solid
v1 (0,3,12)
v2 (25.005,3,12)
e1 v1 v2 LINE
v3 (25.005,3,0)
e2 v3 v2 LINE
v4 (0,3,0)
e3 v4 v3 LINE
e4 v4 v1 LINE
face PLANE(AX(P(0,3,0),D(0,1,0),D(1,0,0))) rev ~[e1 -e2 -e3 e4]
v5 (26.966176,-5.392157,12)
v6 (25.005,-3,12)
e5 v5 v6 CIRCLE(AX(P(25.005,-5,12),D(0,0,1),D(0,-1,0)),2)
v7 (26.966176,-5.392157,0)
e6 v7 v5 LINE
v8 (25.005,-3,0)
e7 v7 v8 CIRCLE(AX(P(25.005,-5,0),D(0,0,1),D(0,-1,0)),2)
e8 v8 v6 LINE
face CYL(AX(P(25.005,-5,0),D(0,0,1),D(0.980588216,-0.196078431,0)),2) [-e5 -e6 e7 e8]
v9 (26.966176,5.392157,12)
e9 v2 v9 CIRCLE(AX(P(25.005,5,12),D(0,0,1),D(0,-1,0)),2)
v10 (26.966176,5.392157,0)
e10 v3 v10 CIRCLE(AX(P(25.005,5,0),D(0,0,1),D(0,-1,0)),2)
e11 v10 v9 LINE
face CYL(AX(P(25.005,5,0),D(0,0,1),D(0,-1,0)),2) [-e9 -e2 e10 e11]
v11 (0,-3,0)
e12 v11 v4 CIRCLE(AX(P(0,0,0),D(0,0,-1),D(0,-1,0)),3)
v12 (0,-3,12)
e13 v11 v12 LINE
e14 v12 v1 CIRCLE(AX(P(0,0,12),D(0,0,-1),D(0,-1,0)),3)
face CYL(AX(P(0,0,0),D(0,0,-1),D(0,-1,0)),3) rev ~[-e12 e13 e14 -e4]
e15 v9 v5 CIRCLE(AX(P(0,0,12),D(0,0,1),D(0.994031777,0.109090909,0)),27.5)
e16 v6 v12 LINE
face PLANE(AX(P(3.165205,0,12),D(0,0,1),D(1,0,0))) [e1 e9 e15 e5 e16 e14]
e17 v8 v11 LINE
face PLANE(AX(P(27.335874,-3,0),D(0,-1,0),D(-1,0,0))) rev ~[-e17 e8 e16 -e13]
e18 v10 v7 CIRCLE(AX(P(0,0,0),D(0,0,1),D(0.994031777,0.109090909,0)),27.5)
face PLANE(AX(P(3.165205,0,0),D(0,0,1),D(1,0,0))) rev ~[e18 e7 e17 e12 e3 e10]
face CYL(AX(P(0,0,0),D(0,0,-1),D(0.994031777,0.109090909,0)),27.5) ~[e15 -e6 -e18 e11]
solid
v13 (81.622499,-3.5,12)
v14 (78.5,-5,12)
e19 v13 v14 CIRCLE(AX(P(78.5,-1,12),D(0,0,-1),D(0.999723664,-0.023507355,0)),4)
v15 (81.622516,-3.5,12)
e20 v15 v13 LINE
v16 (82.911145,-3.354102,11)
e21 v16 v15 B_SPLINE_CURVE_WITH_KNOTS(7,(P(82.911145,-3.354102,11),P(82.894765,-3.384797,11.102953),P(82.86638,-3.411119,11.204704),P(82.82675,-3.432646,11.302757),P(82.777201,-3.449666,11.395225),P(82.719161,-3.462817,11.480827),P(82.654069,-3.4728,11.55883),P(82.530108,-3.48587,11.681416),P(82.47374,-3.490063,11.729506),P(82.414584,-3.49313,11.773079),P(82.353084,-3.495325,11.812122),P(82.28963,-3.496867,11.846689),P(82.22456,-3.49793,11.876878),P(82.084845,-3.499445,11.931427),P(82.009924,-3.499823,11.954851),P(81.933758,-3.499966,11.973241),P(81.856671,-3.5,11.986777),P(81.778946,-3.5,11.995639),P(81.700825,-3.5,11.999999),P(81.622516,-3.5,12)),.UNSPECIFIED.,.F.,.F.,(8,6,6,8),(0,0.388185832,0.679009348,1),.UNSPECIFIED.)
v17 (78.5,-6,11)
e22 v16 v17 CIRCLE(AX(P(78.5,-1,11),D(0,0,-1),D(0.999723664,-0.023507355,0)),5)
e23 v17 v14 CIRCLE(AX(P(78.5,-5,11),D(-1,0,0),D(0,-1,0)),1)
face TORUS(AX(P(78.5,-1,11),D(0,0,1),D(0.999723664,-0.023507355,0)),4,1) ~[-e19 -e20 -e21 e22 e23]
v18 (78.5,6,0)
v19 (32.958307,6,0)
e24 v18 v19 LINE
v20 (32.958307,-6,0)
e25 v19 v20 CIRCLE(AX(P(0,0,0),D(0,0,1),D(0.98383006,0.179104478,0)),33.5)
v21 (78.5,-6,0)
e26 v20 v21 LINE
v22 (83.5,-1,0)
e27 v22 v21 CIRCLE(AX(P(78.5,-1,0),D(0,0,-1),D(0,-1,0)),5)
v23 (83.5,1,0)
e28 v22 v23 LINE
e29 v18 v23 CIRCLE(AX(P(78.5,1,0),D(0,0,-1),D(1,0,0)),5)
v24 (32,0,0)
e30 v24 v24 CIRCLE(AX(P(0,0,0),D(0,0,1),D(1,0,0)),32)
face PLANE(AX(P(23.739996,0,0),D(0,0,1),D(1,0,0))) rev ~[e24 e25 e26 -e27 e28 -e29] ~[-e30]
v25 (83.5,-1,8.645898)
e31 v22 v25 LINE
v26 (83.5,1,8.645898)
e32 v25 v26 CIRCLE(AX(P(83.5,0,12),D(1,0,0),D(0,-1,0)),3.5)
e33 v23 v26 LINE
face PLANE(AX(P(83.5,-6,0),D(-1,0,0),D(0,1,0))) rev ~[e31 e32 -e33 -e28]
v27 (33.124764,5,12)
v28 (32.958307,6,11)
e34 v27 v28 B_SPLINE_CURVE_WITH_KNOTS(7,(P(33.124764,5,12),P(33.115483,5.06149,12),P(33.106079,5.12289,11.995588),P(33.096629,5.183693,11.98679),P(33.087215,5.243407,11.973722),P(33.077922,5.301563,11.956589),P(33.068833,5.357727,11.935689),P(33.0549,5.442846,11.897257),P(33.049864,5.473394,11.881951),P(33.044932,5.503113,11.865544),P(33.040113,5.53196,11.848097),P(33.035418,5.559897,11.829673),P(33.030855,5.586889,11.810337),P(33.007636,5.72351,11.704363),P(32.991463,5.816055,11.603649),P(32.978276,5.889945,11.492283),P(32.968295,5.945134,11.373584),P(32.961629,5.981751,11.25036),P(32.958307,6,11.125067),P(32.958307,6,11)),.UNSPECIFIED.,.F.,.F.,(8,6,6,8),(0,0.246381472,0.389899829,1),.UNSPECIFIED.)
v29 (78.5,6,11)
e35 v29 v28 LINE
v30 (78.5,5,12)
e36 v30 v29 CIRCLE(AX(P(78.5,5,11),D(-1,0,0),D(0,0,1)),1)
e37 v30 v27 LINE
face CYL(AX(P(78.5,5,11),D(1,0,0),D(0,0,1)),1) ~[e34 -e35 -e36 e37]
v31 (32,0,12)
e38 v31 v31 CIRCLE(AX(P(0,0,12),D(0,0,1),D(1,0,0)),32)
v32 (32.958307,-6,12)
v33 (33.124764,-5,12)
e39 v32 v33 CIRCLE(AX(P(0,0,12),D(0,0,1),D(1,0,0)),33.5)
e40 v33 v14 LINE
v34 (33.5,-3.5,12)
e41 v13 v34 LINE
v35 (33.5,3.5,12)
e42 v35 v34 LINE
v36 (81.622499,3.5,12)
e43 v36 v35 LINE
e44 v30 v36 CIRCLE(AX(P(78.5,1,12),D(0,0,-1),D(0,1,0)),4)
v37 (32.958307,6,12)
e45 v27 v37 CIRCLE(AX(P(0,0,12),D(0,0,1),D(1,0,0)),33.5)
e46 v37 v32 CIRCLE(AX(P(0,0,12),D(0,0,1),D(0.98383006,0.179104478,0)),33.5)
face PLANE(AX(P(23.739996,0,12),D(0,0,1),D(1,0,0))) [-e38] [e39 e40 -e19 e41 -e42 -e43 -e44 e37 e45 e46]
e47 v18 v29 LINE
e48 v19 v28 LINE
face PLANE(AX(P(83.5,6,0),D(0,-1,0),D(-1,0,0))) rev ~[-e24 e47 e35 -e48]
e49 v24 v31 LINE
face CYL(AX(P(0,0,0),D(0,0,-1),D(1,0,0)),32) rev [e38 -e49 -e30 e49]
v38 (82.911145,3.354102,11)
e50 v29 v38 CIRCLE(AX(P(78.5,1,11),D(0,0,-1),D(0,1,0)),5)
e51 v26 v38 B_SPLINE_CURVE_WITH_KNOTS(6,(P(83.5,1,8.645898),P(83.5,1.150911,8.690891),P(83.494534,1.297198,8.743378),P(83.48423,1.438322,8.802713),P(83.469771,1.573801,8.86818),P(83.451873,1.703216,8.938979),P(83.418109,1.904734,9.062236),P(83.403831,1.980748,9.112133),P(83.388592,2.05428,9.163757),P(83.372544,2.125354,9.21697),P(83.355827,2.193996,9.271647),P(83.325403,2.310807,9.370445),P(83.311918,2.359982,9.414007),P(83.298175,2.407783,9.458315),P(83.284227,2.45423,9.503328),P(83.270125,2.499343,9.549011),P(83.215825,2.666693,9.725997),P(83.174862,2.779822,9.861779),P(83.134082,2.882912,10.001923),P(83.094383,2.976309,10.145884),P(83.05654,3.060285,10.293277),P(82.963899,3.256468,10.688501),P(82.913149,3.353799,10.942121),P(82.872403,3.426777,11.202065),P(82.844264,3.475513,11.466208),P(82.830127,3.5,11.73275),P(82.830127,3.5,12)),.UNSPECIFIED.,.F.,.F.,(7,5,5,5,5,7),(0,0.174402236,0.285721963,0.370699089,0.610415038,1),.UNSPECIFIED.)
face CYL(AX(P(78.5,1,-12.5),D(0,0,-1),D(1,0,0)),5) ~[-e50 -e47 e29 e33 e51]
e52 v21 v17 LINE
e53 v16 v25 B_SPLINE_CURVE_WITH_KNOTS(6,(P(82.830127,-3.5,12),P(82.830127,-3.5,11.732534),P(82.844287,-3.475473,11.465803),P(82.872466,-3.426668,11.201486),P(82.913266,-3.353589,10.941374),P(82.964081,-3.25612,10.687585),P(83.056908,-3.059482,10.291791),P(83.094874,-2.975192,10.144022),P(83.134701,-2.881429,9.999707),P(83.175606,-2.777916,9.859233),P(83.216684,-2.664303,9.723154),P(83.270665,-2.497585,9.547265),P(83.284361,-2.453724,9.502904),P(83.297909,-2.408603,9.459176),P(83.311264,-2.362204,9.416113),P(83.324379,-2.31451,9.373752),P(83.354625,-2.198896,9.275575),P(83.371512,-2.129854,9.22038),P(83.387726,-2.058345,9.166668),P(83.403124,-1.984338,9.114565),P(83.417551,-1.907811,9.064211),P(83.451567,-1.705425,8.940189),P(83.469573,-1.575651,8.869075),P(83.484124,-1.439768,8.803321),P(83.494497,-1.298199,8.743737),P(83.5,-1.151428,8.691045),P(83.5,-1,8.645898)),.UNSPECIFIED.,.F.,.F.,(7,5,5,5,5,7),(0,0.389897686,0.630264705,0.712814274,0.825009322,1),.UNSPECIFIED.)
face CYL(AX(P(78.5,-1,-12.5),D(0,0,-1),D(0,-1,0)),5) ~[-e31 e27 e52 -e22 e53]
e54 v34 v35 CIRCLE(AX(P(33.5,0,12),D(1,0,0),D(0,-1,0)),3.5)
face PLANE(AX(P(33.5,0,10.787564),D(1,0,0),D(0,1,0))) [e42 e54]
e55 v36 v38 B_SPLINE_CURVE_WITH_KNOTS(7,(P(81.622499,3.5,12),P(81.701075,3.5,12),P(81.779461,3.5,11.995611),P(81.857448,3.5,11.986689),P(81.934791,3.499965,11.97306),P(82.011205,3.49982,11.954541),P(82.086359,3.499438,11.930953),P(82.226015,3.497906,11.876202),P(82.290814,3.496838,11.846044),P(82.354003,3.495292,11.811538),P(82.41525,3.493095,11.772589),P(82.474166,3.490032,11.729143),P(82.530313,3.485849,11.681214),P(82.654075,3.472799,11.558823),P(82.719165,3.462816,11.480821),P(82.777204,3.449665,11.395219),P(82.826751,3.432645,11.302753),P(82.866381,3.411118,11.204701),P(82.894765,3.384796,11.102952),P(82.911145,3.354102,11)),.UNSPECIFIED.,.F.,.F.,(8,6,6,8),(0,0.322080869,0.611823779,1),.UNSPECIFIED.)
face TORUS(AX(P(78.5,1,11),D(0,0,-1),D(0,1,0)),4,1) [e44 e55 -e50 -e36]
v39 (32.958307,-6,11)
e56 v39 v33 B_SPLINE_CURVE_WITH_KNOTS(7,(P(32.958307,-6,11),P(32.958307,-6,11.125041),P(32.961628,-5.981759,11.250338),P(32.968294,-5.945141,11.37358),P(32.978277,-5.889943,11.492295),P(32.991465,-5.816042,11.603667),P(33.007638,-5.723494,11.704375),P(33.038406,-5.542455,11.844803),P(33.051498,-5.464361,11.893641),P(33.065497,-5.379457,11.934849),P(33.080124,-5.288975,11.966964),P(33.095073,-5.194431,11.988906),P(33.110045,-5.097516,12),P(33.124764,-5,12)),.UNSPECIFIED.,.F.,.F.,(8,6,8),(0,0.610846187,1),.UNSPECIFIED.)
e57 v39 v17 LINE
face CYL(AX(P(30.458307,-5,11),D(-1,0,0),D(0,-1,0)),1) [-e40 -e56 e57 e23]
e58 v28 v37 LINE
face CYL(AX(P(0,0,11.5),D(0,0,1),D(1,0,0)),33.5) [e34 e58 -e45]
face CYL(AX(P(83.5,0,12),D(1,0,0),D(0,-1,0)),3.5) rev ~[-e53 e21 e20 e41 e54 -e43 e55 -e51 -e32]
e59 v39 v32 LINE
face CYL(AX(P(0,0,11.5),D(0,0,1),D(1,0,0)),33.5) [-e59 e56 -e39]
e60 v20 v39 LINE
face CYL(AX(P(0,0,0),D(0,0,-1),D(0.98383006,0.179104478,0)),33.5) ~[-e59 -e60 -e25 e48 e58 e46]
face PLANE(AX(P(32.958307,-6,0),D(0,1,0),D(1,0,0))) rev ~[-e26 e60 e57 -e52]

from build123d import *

# Parameters (mm, degrees)
F1_DEPTH     = 12
F2_R         = 2
F3_R         = 32
F4_DEPTH     = 12
F6_DEPTH     = 50
F7_T1_DEPTH  = 37
F8_T4_DEPTH  = 48.0416930046
F8_S5_R      = 33.5
F8_T6_DEPTH  = 26
F8_T10_DEPTH = 48.0416930046
F8_S11_R     = 33.5
F8_T12_DEPTH = 26
F8_T14_ANGLE = 88.6530036621
F8_T16_ANGLE = 88.6530036621


# Not quite as in the source:
# - a fillet or chamfer that OpenCascade refuses, or shapes differently, is made with other operations: its cross-section is extruded or revolved along the edge and cut away or added


with BuildPart() as f1:
    # F0 (on Top) → F1 (new body)
    with BuildSketch(Plane.XY):
        with BuildLine():
            Line((0, 3), (27.3358738657, 3))
            ThreePointArc((27.3358738657, 3), (-27.5, 0), (27.3358738657, -3))
            Line((27.3358738657, -3), (0, -3))
            ThreePointArc((0, -3), (-3, 0), (0, 3))
        make_face()
    extrude(amount=F1_DEPTH)

    # F2
    f2_edges = [f1.edges().sort_by_distance(p)[0] for p in [
        (27.335874, 3, 6),
        (27.335874, -3, 6),
    ]]
    fillet(f2_edges, radius=F2_R)


with BuildPart() as f4:
    # F3 (on Top) → F4 (new body)
    with BuildSketch(Plane.XY):
        with BuildLine():
            Line((83.5, 6), (32.9583069954, 6))
            ThreePointArc((32.9583069954, 6), (-33.5, 0), (32.9583069954, -6))
            Line((32.9583069954, -6), (83.5, -6))
            Line((83.5, -6), (83.5, 6))
        make_face()
        Circle(F3_R, mode=Mode.SUBTRACT)
    extrude(amount=F4_DEPTH)

    # F5 (on face) → F6 (cut)
    with BuildSketch(Plane.YZ.offset(83.5)):
        with BuildLine():
            ThreePointArc((-3.5, 12), (0, 8.5), (3.5, 12))
            Line((3.5, 12), (-3.5, 12))
        make_face()
    extrude(amount=-F6_DEPTH, mode=Mode.SUBTRACT)

    # F7: fillet of radius 5 on 2 edges, made by hand

    # F7_s2 → F7_t1 (cut)
    with BuildSketch(Plane.XY.offset(-12.5)):
        with BuildLine():
            ThreePointArc((78.5, -6), (82.0355339059, -4.5355339059), (83.5, -1))
            Line((83.5, -1), (83.5, -6))
            Line((83.5, -6), (78.5, -6))
        make_face()
        with BuildLine():
            ThreePointArc((83.5, 1), (82.0355339059, 4.5355339059), (78.5, 6))
            Line((78.5, 6), (83.5, 6))
            Line((83.5, 6), (83.5, 1))
        make_face()
    extrude(amount=F7_T1_DEPTH, mode=Mode.SUBTRACT)

    # F8: fillet of radius 1 on 2 edges, made by hand


with BuildPart() as f8_tool2:
    # F8_s3 → F8_t4 (new body)
    with BuildSketch(Plane.YZ.offset(30.4583069954)):
        with BuildLine():
            ThreePointArc((-6, 11), (-5.7071067812, 11.7071067812), (-5, 12))
            Line((-5, 12), (-6, 12))
            Line((-6, 12), (-6, 11))
        make_face()
    extrude(amount=F8_T4_DEPTH)

    # F8_s5 → F8_t6 (cut, symmetric)
    with BuildSketch(Plane.XY.offset(11.5)):
        Circle(F8_S5_R)
    extrude(amount=F8_T6_DEPTH, both=True, mode=Mode.SUBTRACT)


with BuildPart() as f4_1:
    add(f4.part)

    # F8_t1: cut F8_tool2
    add(f8_tool2.part, mode=Mode.SUBTRACT)


with BuildPart() as f8_tool8:
    # F8_s9 → F8_t10 (new body)
    with BuildSketch(Plane.YZ.offset(78.5)):
        with BuildLine():
            ThreePointArc((5, 12), (5.7071067812, 11.7071067812), (6, 11))
            Line((6, 11), (6, 12))
            Line((6, 12), (5, 12))
        make_face()
    extrude(amount=-F8_T10_DEPTH)

    # F8_s11 → F8_t12 (cut, symmetric)
    with BuildSketch(Plane.XY.offset(11.5)):
        Circle(F8_S11_R)
    extrude(amount=F8_T12_DEPTH, both=True, mode=Mode.SUBTRACT)


with BuildPart() as f4_2:
    add(f4_1.part)

    # F8_t7: cut F8_tool8
    add(f8_tool8.part, mode=Mode.SUBTRACT)

    # F8_s13 → F8_t14 (revolve, cut)
    with BuildSketch(Plane.YZ.offset(78.4999999999)):
        with BuildLine():
            ThreePointArc((5, 12), (5.7071067812, 11.7071067812), (6, 11))
            Line((6, 11), (6, 12))
            Line((6, 12), (5, 12))
        make_face()
    revolve(axis=Axis((78.4999999999, 0.9999999999, 12), (0, 0, -1)), revolution_arc=F8_T14_ANGLE, mode=Mode.SUBTRACT)

    # F8_s15 → F8_t16 (revolve, cut)
    with BuildSketch(Plane(origin=(0.0198779079, 0.845370075, 0), x_dir=(0, 0, 1), z_dir=(0.0235073555, 0.9997236639, 0))):
        with BuildLine():
            ThreePointArc((11, 83.5018149746), (11.7071067812, 83.2089217558), (12, 82.5018149746))
            Line((12, 82.5018149746), (12, 83.5018149746))
            Line((12, 83.5018149746), (11, 83.5018149746))
        make_face()
    revolve(axis=Axis((78.4999999999, -0.9999999999, 12), (0, 0, -1)), revolution_arc=F8_T16_ANGLE, mode=Mode.SUBTRACT)


solid = Compound([f1.part, f4_2.part])
